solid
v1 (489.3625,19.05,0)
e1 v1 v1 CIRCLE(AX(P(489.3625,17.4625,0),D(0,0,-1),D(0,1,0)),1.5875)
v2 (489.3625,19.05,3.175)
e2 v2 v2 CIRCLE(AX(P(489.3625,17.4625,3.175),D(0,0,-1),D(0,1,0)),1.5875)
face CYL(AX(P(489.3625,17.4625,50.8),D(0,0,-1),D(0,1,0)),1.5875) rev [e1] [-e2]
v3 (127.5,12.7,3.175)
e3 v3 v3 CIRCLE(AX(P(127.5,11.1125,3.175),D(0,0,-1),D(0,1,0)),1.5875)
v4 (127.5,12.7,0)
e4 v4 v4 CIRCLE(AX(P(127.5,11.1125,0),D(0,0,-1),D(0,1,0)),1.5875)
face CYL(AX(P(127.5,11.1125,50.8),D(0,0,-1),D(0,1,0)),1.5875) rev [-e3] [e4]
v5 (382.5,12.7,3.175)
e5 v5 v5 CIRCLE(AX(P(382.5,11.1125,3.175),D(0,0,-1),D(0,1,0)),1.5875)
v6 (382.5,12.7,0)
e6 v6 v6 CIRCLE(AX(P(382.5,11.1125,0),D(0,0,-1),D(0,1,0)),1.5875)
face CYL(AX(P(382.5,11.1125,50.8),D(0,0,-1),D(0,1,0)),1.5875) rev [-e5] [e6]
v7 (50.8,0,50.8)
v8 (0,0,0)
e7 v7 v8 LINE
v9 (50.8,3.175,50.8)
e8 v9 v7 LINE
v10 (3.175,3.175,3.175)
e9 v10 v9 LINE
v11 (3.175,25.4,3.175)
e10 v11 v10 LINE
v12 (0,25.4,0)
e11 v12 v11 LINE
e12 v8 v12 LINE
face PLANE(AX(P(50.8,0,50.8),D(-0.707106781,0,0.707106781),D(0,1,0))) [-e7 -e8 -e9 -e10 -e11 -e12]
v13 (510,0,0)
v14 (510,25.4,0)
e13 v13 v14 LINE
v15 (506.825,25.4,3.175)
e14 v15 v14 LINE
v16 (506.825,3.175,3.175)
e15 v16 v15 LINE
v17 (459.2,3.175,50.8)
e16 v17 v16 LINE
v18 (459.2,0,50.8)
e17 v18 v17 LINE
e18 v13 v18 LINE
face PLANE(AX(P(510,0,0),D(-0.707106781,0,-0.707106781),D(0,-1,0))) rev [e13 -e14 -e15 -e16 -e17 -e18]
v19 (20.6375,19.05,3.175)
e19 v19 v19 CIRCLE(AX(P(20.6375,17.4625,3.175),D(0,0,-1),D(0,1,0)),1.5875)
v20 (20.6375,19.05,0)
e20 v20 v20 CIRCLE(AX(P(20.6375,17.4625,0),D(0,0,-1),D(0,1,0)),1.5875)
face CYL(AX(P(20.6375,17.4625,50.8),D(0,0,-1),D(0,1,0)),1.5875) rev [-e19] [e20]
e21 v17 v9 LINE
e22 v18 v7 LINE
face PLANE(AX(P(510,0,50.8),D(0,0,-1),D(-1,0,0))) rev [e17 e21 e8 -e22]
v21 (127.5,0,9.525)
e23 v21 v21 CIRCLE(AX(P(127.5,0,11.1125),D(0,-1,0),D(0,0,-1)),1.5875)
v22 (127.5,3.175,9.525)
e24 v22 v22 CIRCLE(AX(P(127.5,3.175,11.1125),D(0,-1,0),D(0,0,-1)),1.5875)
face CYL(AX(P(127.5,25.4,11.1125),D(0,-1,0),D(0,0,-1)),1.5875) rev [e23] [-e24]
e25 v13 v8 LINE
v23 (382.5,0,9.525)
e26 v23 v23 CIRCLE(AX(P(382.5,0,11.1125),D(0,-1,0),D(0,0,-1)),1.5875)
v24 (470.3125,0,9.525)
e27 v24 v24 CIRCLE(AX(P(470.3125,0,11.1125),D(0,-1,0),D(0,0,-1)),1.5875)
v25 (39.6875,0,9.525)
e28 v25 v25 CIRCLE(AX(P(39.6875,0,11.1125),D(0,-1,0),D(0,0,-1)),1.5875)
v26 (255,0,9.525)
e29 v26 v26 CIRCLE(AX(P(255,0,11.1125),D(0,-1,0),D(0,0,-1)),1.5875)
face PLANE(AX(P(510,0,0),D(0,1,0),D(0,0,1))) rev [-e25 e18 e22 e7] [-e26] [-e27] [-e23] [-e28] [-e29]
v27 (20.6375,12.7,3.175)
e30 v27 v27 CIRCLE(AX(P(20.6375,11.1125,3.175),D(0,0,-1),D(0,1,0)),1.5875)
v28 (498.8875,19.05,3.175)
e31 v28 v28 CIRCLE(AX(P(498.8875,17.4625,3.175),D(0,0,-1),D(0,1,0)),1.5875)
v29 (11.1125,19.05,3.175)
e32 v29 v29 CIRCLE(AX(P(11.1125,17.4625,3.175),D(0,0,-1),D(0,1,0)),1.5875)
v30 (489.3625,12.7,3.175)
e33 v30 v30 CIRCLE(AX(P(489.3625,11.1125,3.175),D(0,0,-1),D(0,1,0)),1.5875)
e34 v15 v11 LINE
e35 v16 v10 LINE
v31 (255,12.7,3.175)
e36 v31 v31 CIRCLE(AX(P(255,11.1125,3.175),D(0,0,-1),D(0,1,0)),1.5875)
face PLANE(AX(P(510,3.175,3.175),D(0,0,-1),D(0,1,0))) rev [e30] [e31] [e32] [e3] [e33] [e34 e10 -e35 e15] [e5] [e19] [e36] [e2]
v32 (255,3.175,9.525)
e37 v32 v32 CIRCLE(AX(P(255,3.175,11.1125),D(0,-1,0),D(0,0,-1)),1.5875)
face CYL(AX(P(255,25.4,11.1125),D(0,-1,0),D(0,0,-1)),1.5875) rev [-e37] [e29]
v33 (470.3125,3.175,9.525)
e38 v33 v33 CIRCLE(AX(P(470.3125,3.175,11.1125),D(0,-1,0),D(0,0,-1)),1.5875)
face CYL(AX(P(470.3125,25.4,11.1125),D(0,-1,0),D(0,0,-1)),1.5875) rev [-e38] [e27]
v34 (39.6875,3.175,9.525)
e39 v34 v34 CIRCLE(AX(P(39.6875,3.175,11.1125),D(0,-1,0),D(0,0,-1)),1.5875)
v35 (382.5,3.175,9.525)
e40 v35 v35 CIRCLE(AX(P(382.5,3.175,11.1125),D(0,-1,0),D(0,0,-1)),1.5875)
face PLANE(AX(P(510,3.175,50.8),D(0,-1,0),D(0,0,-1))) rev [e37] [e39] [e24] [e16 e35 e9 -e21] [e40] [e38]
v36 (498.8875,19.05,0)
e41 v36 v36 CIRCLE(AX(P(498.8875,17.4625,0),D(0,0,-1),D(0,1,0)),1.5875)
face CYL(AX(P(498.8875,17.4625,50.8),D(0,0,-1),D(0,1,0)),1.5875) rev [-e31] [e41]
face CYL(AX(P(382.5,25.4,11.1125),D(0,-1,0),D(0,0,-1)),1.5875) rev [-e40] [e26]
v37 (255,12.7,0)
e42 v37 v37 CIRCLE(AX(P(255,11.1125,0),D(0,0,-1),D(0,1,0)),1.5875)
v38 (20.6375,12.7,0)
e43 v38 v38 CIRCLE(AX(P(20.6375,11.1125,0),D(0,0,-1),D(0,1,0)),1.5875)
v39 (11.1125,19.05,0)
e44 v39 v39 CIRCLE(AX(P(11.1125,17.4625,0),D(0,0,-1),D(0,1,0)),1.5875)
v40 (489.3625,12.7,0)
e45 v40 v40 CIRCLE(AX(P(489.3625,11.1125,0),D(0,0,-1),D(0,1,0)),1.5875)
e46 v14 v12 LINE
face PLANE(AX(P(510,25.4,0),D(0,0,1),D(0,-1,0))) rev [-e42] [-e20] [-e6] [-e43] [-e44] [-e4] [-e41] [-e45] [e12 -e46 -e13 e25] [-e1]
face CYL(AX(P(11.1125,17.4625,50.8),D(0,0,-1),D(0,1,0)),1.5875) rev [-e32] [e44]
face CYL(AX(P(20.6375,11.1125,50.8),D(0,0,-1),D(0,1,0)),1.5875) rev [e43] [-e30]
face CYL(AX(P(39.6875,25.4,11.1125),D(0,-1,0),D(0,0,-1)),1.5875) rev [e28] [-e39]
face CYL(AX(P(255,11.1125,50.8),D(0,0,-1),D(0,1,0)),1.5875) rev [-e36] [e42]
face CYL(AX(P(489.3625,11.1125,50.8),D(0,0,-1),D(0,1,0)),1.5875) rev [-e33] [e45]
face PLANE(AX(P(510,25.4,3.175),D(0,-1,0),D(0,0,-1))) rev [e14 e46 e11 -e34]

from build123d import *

# Parameters (mm, degrees)
BOSS_EXTRUDE1_DEPTH              = 510
CHAMFER6_SIZE                    = 50.8
CHAMFER7_SIZE                    = 50.8
BOTTOMHOLES_SKETCH3_R            = 1.5875
BOTTOMHOLES_CUT_EXTRUDE1_DEPTH   = 514.152803753
BACKSIDEHOLES_SKETCH2_R          = 1.5875
BACKSIDEHOLES_CUT_EXTRUDE2_DEPTH = 514.152803753


with BuildPart() as part:
    # Sketch1 → Boss-Extrude1 (new body)
    with BuildSketch(Plane(origin=(0, 0, 0), x_dir=(0, 0, -1), z_dir=(1, 0, 0))):
        Polygon((0, 0), (-50.8, 0), (-50.8, 3.175), (-3.175, 3.175), (-3.175, 25.4), (0, 25.4), align=None)
    extrude(amount=BOSS_EXTRUDE1_DEPTH)

    # Chamfer6
    chamfer6_edges = [part.edges().sort_by_distance(p)[0] for p in [
        (510, 1.5875, 50.8),
    ]]
    chamfer(chamfer6_edges, length=CHAMFER6_SIZE - 0.0001)  # a hair under: the kernel refuses the full size

    # Chamfer7
    chamfer7_edges = [part.edges().sort_by_distance(p)[0] for p in [
        (0, 1.5875, 50.8),
    ]]
    chamfer(chamfer7_edges, length=CHAMFER7_SIZE - 0.0001)  # a hair under: the kernel refuses the full size

    # BottomHoles-Sketch3 → BottomHoles-Cut-Extrude1 (cut, through all)
    with BuildSketch(Plane.XZ):
        with Locations(Location((39.6875, 11.1125, 0), (0, 0, 270))):
            Circle(BOTTOMHOLES_SKETCH3_R)
        with Locations(Location((470.3125, 11.1125, 0), (0, 0, 270))):
            Circle(BOTTOMHOLES_SKETCH3_R)
        with Locations(Location((127.5, 11.1125, 0), (0, 0, 270))):
            Circle(BOTTOMHOLES_SKETCH3_R)
        with Locations(Location((255, 11.1125, 0), (0, 0, 270))):
            Circle(BOTTOMHOLES_SKETCH3_R)
        with Locations(Location((382.5, 11.1125, 0), (0, 0, 270))):
            Circle(BOTTOMHOLES_SKETCH3_R)
    extrude(amount=-BOTTOMHOLES_CUT_EXTRUDE1_DEPTH, mode=Mode.SUBTRACT)

    # BackSideHoles-Sketch2 → BackSideHoles-Cut-Extrude2 (cut, through all)
    with BuildSketch(Plane(origin=(0, 0, 0), x_dir=(-1, 0, 0), z_dir=(0, 0, -1))):
        with Locations(Location((-498.8875, 17.4625, 0), (0, 0, 90))):
            Circle(BACKSIDEHOLES_SKETCH2_R)
        with Locations(Location((-489.3625, 17.4625, 0), (0, 0, 90))):
            Circle(BACKSIDEHOLES_SKETCH2_R)
        with Locations(Location((-20.6375, 17.4625, 0), (0, 0, 90))):
            Circle(BACKSIDEHOLES_SKETCH2_R)
        with Locations(Location((-11.1125, 17.4625, 0), (0, 0, 90))):
            Circle(BACKSIDEHOLES_SKETCH2_R)
        with Locations(Location((-20.6375, 11.1125, 0), (0, 0, 90))):
            Circle(BACKSIDEHOLES_SKETCH2_R)
        with Locations(Location((-489.3625, 11.1125, 0), (0, 0, 90))):
            Circle(BACKSIDEHOLES_SKETCH2_R)
        with Locations(Location((-382.5, 11.1125, 0), (0, 0, 90))):
            Circle(BACKSIDEHOLES_SKETCH2_R)
        with Locations(Location((-255, 11.1125, 0), (0, 0, 90))):
            Circle(BACKSIDEHOLES_SKETCH2_R)
        with Locations(Location((-127.5, 11.1125, 0), (0, 0, 90))):
            Circle(BACKSIDEHOLES_SKETCH2_R)
    extrude(amount=-BACKSIDEHOLES_CUT_EXTRUDE2_DEPTH, mode=Mode.SUBTRACT)


solid = part.part
